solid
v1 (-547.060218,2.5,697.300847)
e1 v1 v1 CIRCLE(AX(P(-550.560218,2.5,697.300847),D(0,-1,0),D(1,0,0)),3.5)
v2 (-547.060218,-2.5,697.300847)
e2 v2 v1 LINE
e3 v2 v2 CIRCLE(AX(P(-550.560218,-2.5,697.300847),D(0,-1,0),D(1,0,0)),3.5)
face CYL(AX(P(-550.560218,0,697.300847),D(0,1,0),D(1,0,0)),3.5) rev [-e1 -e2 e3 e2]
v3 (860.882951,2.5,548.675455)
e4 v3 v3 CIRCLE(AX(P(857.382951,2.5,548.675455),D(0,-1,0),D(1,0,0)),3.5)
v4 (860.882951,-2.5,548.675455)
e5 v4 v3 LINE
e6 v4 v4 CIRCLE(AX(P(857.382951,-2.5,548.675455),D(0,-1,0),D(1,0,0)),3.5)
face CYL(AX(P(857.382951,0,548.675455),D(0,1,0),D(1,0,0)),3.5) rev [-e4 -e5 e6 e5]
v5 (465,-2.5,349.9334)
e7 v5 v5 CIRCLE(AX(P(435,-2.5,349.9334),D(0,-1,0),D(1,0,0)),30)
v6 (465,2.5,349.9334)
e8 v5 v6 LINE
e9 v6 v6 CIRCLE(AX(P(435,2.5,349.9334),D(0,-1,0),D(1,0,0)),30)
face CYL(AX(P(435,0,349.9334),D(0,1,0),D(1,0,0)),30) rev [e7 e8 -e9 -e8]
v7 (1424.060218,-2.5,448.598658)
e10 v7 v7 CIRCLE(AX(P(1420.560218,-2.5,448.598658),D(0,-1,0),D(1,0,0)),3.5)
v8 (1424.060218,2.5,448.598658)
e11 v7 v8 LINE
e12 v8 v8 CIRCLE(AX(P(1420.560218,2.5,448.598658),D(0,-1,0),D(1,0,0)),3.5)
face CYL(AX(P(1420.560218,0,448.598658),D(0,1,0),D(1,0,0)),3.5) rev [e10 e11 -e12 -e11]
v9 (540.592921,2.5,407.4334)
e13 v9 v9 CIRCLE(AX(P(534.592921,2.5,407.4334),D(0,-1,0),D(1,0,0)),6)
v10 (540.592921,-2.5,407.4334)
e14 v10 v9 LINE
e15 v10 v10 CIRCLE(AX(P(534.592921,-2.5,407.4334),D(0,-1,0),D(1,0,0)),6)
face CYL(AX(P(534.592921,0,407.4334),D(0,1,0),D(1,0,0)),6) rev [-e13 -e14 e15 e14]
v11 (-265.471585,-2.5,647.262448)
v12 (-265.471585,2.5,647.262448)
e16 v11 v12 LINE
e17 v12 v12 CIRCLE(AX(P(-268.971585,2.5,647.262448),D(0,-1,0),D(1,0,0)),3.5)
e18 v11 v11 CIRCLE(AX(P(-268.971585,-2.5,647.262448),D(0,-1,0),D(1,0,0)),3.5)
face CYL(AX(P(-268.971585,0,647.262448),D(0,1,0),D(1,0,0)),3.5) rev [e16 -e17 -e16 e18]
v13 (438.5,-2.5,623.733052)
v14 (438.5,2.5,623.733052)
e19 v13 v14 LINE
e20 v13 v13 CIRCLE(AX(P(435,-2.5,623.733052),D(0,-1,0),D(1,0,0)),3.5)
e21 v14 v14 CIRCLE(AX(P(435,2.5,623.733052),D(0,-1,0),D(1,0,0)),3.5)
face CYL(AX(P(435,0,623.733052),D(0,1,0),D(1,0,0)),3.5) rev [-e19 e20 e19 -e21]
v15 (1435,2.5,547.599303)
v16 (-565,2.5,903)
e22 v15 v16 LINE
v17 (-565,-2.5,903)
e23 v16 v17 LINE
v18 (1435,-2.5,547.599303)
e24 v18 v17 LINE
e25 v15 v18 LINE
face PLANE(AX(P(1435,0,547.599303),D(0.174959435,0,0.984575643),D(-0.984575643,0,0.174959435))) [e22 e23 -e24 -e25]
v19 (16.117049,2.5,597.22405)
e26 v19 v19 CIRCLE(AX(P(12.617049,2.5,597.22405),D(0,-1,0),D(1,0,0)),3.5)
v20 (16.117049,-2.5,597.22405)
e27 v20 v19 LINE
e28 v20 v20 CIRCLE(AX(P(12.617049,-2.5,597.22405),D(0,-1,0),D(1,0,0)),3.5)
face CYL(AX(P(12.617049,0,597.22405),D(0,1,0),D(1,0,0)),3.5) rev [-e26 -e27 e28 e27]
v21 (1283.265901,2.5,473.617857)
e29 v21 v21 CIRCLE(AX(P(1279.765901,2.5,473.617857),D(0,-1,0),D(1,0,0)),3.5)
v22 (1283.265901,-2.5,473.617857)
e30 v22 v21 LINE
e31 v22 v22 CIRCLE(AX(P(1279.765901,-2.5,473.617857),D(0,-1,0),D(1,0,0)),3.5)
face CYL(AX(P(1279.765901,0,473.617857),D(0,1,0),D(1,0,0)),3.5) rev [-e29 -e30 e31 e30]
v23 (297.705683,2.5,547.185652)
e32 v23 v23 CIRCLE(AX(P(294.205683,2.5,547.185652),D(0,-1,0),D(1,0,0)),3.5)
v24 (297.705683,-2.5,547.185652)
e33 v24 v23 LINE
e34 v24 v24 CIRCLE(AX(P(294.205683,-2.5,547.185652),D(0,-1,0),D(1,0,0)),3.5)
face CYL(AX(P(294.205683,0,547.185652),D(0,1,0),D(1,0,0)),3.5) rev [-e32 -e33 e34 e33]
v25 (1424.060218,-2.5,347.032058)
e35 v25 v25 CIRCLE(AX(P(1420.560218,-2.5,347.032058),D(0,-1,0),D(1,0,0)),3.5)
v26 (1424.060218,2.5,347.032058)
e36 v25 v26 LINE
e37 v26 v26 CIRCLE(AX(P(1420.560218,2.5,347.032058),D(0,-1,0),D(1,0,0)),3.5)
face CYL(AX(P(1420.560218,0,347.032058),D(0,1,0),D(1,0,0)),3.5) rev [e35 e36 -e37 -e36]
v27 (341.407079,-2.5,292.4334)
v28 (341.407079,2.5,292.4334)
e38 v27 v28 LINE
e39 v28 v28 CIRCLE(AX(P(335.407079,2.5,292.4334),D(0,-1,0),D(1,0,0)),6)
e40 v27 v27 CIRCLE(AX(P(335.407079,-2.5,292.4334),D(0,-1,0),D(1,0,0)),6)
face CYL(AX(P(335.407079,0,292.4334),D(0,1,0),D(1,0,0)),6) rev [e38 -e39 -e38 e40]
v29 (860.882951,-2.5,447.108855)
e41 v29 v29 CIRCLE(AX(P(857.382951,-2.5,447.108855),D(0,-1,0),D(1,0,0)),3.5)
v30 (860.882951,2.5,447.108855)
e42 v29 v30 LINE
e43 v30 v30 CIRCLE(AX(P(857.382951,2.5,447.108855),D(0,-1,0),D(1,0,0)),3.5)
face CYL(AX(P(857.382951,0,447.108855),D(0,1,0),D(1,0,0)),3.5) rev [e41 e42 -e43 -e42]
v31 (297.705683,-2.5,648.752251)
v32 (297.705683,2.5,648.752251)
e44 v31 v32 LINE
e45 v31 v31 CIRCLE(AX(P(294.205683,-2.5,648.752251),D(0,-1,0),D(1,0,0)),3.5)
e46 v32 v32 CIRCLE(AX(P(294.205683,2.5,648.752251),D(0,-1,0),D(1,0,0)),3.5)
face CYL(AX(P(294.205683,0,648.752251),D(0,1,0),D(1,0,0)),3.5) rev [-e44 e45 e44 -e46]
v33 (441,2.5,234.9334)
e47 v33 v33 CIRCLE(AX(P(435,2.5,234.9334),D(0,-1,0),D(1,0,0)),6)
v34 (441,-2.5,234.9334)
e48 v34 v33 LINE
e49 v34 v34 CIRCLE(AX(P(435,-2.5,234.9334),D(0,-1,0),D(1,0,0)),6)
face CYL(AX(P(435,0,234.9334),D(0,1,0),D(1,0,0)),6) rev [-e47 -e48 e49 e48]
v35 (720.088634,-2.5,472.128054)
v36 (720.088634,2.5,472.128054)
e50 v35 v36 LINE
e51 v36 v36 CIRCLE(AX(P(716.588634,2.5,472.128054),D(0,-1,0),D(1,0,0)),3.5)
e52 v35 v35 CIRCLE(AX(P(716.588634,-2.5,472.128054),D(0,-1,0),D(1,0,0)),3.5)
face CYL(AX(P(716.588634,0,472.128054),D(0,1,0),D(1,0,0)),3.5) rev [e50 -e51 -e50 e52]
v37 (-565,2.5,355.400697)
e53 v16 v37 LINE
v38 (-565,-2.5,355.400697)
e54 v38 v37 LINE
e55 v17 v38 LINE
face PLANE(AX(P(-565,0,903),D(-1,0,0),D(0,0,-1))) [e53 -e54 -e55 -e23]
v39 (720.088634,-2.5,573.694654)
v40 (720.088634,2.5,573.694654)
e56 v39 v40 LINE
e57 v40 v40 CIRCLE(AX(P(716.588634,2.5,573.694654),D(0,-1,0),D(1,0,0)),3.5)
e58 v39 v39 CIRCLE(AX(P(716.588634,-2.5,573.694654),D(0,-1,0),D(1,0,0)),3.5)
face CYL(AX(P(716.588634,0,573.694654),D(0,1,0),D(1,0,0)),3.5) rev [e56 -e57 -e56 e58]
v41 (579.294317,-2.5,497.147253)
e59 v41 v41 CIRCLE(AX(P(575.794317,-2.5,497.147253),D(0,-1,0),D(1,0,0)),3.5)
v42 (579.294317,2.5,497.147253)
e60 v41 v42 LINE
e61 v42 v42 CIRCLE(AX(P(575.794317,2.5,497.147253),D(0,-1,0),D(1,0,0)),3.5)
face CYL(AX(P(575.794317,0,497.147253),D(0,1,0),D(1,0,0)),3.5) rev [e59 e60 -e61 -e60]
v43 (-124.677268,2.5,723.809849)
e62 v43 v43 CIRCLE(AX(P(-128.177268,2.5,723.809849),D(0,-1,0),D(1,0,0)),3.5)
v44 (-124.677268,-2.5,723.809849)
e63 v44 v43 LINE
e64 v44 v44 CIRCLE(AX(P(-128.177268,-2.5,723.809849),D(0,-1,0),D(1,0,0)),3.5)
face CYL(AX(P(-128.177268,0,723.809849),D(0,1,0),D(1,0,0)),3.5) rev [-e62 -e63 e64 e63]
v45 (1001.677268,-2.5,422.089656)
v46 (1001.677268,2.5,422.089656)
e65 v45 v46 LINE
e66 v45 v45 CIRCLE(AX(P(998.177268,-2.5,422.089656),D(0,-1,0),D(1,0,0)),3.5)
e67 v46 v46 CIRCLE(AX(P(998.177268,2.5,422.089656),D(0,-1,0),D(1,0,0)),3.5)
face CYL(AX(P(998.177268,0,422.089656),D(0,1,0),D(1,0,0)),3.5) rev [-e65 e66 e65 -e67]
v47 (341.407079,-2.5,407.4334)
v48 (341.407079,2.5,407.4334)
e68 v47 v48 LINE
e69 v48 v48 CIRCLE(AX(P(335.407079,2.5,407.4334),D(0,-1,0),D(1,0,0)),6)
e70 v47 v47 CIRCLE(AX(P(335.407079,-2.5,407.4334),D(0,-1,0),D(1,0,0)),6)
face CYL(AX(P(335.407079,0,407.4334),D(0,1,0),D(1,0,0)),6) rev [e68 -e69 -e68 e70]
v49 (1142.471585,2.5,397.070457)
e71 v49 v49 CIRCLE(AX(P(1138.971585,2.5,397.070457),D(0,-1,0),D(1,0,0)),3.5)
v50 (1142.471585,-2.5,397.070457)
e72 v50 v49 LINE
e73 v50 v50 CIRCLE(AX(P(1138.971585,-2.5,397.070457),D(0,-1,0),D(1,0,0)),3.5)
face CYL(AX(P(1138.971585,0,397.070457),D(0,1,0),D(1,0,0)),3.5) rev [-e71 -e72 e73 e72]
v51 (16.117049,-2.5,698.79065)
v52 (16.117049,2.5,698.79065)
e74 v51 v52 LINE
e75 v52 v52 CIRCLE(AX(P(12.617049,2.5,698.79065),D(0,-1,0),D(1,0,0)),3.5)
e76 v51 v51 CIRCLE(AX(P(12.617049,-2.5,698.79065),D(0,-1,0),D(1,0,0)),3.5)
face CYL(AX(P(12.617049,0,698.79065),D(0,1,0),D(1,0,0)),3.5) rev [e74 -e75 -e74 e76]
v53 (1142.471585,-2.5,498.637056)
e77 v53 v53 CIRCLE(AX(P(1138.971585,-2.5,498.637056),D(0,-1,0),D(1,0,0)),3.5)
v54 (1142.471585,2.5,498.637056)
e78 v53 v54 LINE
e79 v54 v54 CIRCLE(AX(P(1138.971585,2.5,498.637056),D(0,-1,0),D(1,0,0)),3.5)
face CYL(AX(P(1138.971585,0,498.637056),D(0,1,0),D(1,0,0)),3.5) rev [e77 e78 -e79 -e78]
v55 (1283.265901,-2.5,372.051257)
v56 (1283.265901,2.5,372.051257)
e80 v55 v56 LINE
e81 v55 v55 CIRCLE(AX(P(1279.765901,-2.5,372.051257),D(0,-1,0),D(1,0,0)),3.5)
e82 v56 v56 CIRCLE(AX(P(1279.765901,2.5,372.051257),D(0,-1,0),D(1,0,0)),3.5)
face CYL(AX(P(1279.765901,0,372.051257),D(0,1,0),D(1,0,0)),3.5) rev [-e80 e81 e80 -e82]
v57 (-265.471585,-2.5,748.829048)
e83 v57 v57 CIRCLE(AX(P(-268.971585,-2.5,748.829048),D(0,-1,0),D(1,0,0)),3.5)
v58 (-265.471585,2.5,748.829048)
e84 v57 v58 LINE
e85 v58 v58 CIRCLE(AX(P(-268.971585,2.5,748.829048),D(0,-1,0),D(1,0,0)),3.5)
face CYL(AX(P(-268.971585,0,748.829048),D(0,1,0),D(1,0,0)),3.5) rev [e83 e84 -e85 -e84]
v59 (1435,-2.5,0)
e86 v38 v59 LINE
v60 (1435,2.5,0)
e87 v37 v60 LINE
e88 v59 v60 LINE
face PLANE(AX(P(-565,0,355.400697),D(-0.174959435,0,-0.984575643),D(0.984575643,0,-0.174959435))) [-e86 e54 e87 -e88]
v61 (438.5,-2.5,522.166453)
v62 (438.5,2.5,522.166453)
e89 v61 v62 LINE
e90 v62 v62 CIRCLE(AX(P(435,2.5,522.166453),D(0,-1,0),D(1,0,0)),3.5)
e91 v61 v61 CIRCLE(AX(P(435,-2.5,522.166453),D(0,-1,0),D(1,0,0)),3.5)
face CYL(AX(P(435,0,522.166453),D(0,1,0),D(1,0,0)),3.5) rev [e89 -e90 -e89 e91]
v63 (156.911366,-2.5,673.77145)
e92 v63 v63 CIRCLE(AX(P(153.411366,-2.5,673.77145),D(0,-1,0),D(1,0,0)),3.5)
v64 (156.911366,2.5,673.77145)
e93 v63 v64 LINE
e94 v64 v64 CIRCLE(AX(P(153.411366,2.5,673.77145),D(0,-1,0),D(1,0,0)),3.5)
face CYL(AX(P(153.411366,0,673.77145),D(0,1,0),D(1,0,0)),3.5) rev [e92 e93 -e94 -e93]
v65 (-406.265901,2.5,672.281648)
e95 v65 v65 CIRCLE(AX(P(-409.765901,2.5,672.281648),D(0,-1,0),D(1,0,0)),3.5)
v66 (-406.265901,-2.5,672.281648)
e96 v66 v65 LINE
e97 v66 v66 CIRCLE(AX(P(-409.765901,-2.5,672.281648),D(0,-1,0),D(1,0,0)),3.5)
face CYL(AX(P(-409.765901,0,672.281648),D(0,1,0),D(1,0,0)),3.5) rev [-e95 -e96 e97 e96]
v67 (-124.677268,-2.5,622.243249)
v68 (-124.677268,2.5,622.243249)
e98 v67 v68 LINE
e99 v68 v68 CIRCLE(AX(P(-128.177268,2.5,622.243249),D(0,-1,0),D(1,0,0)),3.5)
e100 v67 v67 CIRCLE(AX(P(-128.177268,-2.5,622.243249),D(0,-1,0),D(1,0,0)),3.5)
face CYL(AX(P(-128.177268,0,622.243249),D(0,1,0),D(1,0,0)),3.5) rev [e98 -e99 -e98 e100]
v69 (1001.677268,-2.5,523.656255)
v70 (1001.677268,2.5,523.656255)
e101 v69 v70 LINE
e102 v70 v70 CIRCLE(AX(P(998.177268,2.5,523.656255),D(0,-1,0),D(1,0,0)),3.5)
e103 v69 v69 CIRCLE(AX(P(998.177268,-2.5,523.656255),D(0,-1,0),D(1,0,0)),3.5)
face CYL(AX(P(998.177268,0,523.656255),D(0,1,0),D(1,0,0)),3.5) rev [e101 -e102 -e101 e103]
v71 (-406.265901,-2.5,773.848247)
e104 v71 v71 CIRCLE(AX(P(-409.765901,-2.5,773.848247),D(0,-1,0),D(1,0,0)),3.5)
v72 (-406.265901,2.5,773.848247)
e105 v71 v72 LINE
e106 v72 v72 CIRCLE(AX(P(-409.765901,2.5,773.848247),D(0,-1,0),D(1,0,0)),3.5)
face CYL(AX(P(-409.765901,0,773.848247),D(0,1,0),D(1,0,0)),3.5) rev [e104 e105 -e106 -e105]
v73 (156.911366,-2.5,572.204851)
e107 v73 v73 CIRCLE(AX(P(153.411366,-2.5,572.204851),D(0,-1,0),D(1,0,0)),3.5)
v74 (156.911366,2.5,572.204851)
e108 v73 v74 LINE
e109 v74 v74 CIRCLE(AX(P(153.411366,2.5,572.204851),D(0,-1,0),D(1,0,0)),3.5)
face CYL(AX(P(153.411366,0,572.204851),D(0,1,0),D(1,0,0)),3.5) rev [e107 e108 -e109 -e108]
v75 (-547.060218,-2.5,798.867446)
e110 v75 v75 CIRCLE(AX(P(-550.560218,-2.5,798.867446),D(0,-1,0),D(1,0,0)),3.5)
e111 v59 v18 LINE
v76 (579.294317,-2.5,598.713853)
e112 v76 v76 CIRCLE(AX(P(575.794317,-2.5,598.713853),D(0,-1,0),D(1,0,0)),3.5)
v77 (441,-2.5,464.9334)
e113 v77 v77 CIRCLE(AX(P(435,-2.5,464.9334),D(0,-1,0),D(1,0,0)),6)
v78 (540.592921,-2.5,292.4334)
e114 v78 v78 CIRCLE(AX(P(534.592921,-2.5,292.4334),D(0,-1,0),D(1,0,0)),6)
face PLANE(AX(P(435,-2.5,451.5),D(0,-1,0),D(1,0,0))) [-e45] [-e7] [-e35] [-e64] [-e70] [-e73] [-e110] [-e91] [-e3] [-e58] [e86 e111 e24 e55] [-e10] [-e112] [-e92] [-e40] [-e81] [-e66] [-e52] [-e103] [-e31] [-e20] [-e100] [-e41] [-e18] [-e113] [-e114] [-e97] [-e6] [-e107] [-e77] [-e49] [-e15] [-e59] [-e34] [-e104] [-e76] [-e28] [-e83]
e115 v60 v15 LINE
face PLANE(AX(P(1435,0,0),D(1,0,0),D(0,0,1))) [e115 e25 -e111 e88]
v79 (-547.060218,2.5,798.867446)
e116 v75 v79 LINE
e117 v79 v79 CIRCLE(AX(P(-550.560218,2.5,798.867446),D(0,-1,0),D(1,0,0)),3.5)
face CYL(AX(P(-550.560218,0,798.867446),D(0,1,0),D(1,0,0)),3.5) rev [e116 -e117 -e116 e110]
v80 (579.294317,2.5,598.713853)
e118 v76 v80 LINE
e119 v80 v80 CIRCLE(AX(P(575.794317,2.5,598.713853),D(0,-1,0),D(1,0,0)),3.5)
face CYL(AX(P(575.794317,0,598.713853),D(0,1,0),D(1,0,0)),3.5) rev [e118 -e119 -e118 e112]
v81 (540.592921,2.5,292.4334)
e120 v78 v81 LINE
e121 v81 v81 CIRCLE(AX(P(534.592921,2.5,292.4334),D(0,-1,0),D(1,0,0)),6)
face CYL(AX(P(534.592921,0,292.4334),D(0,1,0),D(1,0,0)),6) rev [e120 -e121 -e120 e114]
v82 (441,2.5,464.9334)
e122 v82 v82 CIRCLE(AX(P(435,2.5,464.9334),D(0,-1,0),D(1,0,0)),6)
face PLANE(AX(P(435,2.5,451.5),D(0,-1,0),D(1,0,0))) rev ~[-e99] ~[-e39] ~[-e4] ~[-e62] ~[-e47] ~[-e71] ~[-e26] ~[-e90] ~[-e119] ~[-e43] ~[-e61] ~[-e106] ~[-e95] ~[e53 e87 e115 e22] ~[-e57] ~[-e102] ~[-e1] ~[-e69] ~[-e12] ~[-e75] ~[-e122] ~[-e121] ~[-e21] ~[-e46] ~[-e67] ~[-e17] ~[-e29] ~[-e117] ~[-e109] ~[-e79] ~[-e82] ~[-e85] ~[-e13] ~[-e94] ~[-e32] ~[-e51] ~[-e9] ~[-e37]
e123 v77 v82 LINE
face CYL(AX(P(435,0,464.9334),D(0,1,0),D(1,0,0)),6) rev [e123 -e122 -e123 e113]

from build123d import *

# Parameters (mm, degrees)
F0_R     = 6
F0_R_2   = 30
F0_R_3   = 3.5
F1_DEPTH = 2.5


# Not quite as in the source:
# - a feature names something its author has since deleted; it is built from what else it names


with BuildPart() as f1:
    # F0 (on Front) → F1 (new body, symmetric)
    with BuildSketch(Plane.XZ):
        Polygon((0, 255), (1435, 0), (1435, 547.5993031359), (-565, 903), (-565, 355.4006968641), align=None)
        with Locations((335.4070785648, 292.4334004787)):
            Circle(F0_R, mode=Mode.SUBTRACT)
        with Locations((335.4070785648, 407.4334004787)):
            Circle(F0_R, mode=Mode.SUBTRACT)
        with Locations((435, 234.9334004787)):
            Circle(F0_R, mode=Mode.SUBTRACT)
        with Locations((534.5929214352, 292.4334004787)):
            Circle(F0_R, mode=Mode.SUBTRACT)
        with Locations((435, 349.9334004787)):
            Circle(F0_R_2, mode=Mode.SUBTRACT)
        with Locations((534.5929214352, 407.4334004787)):
            Circle(F0_R, mode=Mode.SUBTRACT)
        with Locations((857.3829507159, 447.1088550113)):
            Circle(F0_R_3, mode=Mode.SUBTRACT)
        with Locations((998.1772676211, 422.08965584)):
            Circle(F0_R_3, mode=Mode.SUBTRACT)
        with Locations((1138.9715845264, 397.0704566686)):
            Circle(F0_R_3, mode=Mode.SUBTRACT)
        with Locations((1279.7659014317, 372.0512574973)):
            Circle(F0_R_3, mode=Mode.SUBTRACT)
        with Locations((1420.560218337, 347.032058326)):
            Circle(F0_R_3, mode=Mode.SUBTRACT)
        with Locations((1420.560218337, 448.5986578473)):
            Circle(F0_R_3, mode=Mode.SUBTRACT)
        with Locations((-409.7659014317, 672.2816475532)):
            Circle(F0_R_3, mode=Mode.SUBTRACT)
        with Locations((-268.9715845264, 647.2624483819)):
            Circle(F0_R_3, mode=Mode.SUBTRACT)
        with Locations((-128.1772676211, 622.2432492105)):
            Circle(F0_R_3, mode=Mode.SUBTRACT)
        with Locations((294.2056830947, 547.1856516966)):
            Circle(F0_R_3, mode=Mode.SUBTRACT)
        with Locations((12.6170492841, 597.2240500392)):
            Circle(F0_R_3, mode=Mode.SUBTRACT)
        with Locations((153.4113661894, 572.2048508679)):
            Circle(F0_R_3, mode=Mode.SUBTRACT)
        with Locations((153.4113661894, 673.7714503892)):
            Circle(F0_R_3, mode=Mode.SUBTRACT)
        with Locations((294.2056830947, 648.7522512179)):
            Circle(F0_R_3, mode=Mode.SUBTRACT)
        with Locations((-550.560218337, 697.3008467245)):
            Circle(F0_R_3, mode=Mode.SUBTRACT)
        with Locations((-409.7659014317, 773.8482470745)):
            Circle(F0_R_3, mode=Mode.SUBTRACT)
        with Locations((-128.1772676211, 723.8098487319)):
            Circle(F0_R_3, mode=Mode.SUBTRACT)
        with Locations((-268.9715845264, 748.8290479032)):
            Circle(F0_R_3, mode=Mode.SUBTRACT)
        with Locations((-550.560218337, 798.8674462459)):
            Circle(F0_R_3, mode=Mode.SUBTRACT)
        with Locations((12.6170492841, 698.7906495606)):
            Circle(F0_R_3, mode=Mode.SUBTRACT)
        with Locations((435, 464.9334004787)):
            Circle(F0_R, mode=Mode.SUBTRACT)
        with Locations((575.7943169053, 497.1472533539)):
            Circle(F0_R_3, mode=Mode.SUBTRACT)
        with Locations((435, 522.1664525253)):
            Circle(F0_R_3, mode=Mode.SUBTRACT)
        with Locations((716.5886338106, 472.1280541826)):
            Circle(F0_R_3, mode=Mode.SUBTRACT)
        with Locations((857.3829507159, 548.6754545326)):
            Circle(F0_R_3, mode=Mode.SUBTRACT)
        with Locations((575.7943169053, 598.7138528753)):
            Circle(F0_R_3, mode=Mode.SUBTRACT)
        with Locations((435, 623.7330520466)):
            Circle(F0_R_3, mode=Mode.SUBTRACT)
        with Locations((716.5886338106, 573.694653704)):
            Circle(F0_R_3, mode=Mode.SUBTRACT)
        with Locations((1138.9715845264, 498.63705619)):
            Circle(F0_R_3, mode=Mode.SUBTRACT)
        with Locations((998.1772676211, 523.6562553613)):
            Circle(F0_R_3, mode=Mode.SUBTRACT)
        with Locations((1279.7659014317, 473.6178570187)):
            Circle(F0_R_3, mode=Mode.SUBTRACT)
    extrude(amount=F1_DEPTH, both=True)


solid = f1.part
